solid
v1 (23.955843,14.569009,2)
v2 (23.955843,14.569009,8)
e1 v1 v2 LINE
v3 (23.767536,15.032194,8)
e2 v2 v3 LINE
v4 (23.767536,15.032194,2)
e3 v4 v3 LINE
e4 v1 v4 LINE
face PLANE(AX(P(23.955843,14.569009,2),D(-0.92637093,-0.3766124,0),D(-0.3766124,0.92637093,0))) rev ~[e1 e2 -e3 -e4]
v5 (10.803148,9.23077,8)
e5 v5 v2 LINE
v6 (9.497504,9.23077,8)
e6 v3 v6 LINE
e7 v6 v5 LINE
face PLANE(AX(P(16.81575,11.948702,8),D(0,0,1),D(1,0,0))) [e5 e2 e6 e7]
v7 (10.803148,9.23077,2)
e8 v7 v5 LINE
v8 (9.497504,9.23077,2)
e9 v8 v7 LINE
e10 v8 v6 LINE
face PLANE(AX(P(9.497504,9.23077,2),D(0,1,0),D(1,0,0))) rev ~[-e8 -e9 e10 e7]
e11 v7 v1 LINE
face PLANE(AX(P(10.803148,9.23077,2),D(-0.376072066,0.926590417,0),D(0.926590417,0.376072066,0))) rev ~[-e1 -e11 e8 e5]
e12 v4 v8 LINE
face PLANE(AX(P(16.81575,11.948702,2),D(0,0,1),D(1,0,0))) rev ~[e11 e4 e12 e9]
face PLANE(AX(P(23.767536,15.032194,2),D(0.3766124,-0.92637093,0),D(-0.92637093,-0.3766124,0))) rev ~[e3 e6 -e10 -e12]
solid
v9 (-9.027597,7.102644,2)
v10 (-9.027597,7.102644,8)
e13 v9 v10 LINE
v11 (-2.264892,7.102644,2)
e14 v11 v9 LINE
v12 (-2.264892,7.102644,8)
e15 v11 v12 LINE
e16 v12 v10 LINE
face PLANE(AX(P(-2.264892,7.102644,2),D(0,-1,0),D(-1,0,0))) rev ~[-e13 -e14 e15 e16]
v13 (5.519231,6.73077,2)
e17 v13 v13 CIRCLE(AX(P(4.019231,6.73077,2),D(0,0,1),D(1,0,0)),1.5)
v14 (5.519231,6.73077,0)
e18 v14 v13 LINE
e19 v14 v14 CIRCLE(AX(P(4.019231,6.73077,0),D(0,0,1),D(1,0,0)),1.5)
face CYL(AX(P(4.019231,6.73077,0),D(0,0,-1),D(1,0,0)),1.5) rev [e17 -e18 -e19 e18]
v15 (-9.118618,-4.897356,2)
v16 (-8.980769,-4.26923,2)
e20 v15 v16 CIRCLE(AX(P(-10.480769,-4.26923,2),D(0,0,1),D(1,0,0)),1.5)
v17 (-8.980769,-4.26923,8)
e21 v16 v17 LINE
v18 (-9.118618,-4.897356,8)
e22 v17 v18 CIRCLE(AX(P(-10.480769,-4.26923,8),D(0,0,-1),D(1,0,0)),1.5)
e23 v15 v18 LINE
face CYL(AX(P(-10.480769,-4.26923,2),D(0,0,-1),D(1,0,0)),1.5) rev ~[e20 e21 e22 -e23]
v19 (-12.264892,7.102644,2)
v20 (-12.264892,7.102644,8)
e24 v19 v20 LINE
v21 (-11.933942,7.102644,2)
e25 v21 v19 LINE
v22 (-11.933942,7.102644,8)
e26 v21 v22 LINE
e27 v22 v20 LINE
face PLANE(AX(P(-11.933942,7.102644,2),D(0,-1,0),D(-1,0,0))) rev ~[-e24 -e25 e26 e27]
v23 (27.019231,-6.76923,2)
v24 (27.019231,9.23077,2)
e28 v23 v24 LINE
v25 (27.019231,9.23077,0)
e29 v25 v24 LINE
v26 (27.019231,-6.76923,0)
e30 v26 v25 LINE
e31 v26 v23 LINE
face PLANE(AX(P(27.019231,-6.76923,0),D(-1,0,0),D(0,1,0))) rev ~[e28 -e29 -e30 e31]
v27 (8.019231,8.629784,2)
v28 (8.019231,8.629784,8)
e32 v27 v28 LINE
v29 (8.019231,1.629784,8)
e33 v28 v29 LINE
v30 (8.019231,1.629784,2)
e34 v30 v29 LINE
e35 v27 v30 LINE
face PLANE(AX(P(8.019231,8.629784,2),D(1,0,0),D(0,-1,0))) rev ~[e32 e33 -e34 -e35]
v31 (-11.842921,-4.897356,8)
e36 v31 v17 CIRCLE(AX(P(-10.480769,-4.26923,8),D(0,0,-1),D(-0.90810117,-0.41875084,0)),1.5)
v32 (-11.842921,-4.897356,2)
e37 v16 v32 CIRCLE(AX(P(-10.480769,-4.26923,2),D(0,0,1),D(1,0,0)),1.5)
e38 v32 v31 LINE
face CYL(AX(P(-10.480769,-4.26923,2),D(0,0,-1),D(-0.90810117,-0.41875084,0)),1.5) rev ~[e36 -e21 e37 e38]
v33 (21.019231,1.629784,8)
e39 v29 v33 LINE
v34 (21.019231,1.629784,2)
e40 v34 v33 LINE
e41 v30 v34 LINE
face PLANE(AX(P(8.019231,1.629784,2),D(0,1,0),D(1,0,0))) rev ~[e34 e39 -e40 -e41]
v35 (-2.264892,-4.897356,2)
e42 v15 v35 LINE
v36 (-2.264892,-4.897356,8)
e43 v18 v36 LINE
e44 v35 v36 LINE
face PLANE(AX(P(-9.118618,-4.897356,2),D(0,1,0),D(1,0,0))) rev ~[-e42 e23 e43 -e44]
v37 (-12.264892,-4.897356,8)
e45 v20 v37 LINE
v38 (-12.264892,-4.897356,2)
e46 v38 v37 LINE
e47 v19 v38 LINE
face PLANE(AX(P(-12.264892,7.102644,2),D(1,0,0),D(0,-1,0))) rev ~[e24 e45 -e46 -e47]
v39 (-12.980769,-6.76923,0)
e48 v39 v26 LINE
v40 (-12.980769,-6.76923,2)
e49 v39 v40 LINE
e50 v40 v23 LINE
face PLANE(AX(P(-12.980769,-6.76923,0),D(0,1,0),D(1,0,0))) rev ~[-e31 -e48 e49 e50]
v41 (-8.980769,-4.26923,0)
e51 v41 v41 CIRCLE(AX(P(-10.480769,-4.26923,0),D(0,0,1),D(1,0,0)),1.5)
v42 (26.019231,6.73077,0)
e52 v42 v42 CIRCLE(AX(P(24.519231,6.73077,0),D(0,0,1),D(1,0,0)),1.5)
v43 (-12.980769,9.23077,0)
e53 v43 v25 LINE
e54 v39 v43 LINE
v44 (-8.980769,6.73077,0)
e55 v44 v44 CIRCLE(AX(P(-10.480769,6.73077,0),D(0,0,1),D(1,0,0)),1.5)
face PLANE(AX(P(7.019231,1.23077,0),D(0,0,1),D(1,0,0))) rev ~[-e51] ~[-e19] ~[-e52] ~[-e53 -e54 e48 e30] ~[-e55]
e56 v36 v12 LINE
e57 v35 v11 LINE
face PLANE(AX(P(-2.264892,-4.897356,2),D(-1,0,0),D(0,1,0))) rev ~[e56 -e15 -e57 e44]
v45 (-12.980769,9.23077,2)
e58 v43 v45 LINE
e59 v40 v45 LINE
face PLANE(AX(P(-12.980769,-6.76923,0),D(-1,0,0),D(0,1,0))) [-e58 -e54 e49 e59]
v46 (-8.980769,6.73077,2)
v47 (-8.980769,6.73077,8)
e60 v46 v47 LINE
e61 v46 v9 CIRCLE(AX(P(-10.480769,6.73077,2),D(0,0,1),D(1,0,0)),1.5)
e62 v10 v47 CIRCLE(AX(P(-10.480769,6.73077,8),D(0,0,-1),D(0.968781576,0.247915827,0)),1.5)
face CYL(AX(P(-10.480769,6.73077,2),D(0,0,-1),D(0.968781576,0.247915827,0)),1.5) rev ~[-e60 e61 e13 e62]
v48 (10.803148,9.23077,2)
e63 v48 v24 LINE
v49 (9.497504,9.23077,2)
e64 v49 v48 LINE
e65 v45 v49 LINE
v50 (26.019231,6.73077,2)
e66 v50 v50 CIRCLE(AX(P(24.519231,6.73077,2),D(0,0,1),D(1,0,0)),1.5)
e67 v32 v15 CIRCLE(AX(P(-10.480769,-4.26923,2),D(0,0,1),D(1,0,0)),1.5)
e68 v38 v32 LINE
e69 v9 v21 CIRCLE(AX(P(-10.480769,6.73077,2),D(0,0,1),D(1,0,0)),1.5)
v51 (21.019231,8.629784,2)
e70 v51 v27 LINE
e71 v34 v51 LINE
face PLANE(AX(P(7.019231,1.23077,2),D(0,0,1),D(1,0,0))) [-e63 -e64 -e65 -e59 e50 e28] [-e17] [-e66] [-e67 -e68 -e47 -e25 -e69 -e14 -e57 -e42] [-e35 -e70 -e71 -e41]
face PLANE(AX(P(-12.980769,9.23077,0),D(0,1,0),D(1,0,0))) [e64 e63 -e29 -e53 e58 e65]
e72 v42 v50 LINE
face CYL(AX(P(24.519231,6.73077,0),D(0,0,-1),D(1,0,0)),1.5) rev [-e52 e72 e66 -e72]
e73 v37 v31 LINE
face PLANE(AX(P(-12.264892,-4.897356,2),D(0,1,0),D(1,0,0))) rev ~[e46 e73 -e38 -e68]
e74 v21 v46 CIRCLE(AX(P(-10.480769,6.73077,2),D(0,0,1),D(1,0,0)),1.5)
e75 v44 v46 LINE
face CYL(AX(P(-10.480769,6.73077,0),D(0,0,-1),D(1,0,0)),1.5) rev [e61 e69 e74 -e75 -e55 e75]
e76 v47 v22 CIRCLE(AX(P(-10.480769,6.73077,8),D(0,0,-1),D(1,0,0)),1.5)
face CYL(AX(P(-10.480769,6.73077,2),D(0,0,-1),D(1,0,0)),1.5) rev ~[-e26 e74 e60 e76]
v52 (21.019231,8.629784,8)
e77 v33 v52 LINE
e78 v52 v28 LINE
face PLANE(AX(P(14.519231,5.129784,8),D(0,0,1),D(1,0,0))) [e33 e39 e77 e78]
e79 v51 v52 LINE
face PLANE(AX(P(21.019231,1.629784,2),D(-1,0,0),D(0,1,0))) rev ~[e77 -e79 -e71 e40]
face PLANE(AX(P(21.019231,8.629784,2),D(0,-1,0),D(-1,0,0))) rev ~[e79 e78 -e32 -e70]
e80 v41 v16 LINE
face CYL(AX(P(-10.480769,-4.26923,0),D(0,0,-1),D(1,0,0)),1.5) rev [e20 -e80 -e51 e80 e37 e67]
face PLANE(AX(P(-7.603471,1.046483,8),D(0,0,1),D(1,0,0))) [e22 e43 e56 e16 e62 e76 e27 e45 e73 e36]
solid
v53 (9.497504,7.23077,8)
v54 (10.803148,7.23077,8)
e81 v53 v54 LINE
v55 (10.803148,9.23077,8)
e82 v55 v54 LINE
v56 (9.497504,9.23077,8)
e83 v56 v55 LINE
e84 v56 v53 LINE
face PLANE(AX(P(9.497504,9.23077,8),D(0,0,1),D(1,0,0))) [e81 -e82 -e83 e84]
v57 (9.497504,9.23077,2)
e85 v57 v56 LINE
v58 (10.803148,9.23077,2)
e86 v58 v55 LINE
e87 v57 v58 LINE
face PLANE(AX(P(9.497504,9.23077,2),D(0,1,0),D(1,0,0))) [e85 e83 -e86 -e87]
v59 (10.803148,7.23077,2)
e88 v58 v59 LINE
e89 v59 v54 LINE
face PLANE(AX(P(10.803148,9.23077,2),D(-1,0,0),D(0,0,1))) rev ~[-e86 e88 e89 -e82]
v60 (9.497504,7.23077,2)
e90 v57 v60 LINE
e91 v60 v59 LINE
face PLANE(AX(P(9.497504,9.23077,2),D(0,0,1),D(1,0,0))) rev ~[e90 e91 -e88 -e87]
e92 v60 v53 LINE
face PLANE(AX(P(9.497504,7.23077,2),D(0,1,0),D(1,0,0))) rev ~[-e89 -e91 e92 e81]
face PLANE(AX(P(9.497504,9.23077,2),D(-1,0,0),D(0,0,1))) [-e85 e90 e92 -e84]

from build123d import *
from build123d import SkipClean  # not in build123d's __all__

# Parameters (mm, degrees)
F0_W     = 40
F0_H     = 16
F0_R     = 1.5
F1_DEPTH = 2
F3_DEPTH = 6
F4_DEPTH = 2


with BuildPart() as f1:
    # F0 (on Top) → F1 (new body)
    with BuildSketch(Plane.XY):
        with Locations((7.0192306489, 1.2307697609)):
            Rectangle(F0_W, F0_H)
        with Locations((-10.4807693511, -4.2692302391)):
            Circle(F0_R, mode=Mode.SUBTRACT)
        with Locations((-10.4807693511, 6.7307697609)):
            Circle(F0_R, mode=Mode.SUBTRACT)
        with Locations((4.0192306489, 6.7307697609)):
            Circle(F0_R, mode=Mode.SUBTRACT)
        with Locations((24.5192306489, 6.7307697609)):
            Circle(F0_R, mode=Mode.SUBTRACT)
    extrude(amount=F1_DEPTH)

    # F2 (on face) → F3 (join)
    with BuildSketch(Plane.XY.offset(2)):
        with BuildLine():
            Line((-11.9339417158, 7.102643501), (-12.2648915183, 7.102643501))
            Line((-12.2648915183, 7.102643501), (-12.2648915183, -4.897356499))
            Line((-12.2648915183, -4.897356499), (-11.8429211054, -4.897356499))
            ThreePointArc((-11.8429211054, -4.897356499), (-10.8023065718, -2.8040975435), (-8.9807693511, -4.2692302391))
            ThreePointArc((-8.9807693511, -4.2692302391), (-9.0156366555, -4.5907674598), (-9.1186175969, -4.897356499))
            Line((-9.1186175969, -4.897356499), (-2.2648915183, -4.897356499))
            Line((-2.2648915183, -4.897356499), (-2.2648915183, 7.102643501))
            Line((-2.2648915183, 7.102643501), (-9.0275969865, 7.102643501))
            ThreePointArc((-9.0275969865, 7.102643501), (-8.9925223039, 6.9181750076), (-8.9807693511, 6.7307697609))
            ThreePointArc((-8.9807693511, 6.7307697609), (-10.6681745979, 5.2425227137), (-11.9339417158, 7.102643501))
        make_face()
        Polygon((9.3223992735, 8.6297835391), (8.0192306489, 8.6297835391), (8.0192306489, 1.6297835391), (21.0192306489, 1.6297835391), (21.0192306489, 8.6297835391), align=None)
        Polygon((23.7675364597, 15.032194342), (9.4975042399, 9.2307697609), (10.8031475786, 9.2307697609), (23.9558426598, 14.569008877), align=None)
    with SkipClean():  # cleaning this boolean's faces spoils the solid; the shape is the same uncleaned
        extrude(amount=F3_DEPTH)


with BuildPart() as f4:
    # F4 (new): a face of the model
    f4_faces = [f1.part.faces().sort_by_distance(p)[0] for p in [
        (10.1503259093, 9.2307697609, 5),
    ]]
    extrude(f4_faces, amount=F4_DEPTH)


solid = Compound([f1.part, f4.part])
